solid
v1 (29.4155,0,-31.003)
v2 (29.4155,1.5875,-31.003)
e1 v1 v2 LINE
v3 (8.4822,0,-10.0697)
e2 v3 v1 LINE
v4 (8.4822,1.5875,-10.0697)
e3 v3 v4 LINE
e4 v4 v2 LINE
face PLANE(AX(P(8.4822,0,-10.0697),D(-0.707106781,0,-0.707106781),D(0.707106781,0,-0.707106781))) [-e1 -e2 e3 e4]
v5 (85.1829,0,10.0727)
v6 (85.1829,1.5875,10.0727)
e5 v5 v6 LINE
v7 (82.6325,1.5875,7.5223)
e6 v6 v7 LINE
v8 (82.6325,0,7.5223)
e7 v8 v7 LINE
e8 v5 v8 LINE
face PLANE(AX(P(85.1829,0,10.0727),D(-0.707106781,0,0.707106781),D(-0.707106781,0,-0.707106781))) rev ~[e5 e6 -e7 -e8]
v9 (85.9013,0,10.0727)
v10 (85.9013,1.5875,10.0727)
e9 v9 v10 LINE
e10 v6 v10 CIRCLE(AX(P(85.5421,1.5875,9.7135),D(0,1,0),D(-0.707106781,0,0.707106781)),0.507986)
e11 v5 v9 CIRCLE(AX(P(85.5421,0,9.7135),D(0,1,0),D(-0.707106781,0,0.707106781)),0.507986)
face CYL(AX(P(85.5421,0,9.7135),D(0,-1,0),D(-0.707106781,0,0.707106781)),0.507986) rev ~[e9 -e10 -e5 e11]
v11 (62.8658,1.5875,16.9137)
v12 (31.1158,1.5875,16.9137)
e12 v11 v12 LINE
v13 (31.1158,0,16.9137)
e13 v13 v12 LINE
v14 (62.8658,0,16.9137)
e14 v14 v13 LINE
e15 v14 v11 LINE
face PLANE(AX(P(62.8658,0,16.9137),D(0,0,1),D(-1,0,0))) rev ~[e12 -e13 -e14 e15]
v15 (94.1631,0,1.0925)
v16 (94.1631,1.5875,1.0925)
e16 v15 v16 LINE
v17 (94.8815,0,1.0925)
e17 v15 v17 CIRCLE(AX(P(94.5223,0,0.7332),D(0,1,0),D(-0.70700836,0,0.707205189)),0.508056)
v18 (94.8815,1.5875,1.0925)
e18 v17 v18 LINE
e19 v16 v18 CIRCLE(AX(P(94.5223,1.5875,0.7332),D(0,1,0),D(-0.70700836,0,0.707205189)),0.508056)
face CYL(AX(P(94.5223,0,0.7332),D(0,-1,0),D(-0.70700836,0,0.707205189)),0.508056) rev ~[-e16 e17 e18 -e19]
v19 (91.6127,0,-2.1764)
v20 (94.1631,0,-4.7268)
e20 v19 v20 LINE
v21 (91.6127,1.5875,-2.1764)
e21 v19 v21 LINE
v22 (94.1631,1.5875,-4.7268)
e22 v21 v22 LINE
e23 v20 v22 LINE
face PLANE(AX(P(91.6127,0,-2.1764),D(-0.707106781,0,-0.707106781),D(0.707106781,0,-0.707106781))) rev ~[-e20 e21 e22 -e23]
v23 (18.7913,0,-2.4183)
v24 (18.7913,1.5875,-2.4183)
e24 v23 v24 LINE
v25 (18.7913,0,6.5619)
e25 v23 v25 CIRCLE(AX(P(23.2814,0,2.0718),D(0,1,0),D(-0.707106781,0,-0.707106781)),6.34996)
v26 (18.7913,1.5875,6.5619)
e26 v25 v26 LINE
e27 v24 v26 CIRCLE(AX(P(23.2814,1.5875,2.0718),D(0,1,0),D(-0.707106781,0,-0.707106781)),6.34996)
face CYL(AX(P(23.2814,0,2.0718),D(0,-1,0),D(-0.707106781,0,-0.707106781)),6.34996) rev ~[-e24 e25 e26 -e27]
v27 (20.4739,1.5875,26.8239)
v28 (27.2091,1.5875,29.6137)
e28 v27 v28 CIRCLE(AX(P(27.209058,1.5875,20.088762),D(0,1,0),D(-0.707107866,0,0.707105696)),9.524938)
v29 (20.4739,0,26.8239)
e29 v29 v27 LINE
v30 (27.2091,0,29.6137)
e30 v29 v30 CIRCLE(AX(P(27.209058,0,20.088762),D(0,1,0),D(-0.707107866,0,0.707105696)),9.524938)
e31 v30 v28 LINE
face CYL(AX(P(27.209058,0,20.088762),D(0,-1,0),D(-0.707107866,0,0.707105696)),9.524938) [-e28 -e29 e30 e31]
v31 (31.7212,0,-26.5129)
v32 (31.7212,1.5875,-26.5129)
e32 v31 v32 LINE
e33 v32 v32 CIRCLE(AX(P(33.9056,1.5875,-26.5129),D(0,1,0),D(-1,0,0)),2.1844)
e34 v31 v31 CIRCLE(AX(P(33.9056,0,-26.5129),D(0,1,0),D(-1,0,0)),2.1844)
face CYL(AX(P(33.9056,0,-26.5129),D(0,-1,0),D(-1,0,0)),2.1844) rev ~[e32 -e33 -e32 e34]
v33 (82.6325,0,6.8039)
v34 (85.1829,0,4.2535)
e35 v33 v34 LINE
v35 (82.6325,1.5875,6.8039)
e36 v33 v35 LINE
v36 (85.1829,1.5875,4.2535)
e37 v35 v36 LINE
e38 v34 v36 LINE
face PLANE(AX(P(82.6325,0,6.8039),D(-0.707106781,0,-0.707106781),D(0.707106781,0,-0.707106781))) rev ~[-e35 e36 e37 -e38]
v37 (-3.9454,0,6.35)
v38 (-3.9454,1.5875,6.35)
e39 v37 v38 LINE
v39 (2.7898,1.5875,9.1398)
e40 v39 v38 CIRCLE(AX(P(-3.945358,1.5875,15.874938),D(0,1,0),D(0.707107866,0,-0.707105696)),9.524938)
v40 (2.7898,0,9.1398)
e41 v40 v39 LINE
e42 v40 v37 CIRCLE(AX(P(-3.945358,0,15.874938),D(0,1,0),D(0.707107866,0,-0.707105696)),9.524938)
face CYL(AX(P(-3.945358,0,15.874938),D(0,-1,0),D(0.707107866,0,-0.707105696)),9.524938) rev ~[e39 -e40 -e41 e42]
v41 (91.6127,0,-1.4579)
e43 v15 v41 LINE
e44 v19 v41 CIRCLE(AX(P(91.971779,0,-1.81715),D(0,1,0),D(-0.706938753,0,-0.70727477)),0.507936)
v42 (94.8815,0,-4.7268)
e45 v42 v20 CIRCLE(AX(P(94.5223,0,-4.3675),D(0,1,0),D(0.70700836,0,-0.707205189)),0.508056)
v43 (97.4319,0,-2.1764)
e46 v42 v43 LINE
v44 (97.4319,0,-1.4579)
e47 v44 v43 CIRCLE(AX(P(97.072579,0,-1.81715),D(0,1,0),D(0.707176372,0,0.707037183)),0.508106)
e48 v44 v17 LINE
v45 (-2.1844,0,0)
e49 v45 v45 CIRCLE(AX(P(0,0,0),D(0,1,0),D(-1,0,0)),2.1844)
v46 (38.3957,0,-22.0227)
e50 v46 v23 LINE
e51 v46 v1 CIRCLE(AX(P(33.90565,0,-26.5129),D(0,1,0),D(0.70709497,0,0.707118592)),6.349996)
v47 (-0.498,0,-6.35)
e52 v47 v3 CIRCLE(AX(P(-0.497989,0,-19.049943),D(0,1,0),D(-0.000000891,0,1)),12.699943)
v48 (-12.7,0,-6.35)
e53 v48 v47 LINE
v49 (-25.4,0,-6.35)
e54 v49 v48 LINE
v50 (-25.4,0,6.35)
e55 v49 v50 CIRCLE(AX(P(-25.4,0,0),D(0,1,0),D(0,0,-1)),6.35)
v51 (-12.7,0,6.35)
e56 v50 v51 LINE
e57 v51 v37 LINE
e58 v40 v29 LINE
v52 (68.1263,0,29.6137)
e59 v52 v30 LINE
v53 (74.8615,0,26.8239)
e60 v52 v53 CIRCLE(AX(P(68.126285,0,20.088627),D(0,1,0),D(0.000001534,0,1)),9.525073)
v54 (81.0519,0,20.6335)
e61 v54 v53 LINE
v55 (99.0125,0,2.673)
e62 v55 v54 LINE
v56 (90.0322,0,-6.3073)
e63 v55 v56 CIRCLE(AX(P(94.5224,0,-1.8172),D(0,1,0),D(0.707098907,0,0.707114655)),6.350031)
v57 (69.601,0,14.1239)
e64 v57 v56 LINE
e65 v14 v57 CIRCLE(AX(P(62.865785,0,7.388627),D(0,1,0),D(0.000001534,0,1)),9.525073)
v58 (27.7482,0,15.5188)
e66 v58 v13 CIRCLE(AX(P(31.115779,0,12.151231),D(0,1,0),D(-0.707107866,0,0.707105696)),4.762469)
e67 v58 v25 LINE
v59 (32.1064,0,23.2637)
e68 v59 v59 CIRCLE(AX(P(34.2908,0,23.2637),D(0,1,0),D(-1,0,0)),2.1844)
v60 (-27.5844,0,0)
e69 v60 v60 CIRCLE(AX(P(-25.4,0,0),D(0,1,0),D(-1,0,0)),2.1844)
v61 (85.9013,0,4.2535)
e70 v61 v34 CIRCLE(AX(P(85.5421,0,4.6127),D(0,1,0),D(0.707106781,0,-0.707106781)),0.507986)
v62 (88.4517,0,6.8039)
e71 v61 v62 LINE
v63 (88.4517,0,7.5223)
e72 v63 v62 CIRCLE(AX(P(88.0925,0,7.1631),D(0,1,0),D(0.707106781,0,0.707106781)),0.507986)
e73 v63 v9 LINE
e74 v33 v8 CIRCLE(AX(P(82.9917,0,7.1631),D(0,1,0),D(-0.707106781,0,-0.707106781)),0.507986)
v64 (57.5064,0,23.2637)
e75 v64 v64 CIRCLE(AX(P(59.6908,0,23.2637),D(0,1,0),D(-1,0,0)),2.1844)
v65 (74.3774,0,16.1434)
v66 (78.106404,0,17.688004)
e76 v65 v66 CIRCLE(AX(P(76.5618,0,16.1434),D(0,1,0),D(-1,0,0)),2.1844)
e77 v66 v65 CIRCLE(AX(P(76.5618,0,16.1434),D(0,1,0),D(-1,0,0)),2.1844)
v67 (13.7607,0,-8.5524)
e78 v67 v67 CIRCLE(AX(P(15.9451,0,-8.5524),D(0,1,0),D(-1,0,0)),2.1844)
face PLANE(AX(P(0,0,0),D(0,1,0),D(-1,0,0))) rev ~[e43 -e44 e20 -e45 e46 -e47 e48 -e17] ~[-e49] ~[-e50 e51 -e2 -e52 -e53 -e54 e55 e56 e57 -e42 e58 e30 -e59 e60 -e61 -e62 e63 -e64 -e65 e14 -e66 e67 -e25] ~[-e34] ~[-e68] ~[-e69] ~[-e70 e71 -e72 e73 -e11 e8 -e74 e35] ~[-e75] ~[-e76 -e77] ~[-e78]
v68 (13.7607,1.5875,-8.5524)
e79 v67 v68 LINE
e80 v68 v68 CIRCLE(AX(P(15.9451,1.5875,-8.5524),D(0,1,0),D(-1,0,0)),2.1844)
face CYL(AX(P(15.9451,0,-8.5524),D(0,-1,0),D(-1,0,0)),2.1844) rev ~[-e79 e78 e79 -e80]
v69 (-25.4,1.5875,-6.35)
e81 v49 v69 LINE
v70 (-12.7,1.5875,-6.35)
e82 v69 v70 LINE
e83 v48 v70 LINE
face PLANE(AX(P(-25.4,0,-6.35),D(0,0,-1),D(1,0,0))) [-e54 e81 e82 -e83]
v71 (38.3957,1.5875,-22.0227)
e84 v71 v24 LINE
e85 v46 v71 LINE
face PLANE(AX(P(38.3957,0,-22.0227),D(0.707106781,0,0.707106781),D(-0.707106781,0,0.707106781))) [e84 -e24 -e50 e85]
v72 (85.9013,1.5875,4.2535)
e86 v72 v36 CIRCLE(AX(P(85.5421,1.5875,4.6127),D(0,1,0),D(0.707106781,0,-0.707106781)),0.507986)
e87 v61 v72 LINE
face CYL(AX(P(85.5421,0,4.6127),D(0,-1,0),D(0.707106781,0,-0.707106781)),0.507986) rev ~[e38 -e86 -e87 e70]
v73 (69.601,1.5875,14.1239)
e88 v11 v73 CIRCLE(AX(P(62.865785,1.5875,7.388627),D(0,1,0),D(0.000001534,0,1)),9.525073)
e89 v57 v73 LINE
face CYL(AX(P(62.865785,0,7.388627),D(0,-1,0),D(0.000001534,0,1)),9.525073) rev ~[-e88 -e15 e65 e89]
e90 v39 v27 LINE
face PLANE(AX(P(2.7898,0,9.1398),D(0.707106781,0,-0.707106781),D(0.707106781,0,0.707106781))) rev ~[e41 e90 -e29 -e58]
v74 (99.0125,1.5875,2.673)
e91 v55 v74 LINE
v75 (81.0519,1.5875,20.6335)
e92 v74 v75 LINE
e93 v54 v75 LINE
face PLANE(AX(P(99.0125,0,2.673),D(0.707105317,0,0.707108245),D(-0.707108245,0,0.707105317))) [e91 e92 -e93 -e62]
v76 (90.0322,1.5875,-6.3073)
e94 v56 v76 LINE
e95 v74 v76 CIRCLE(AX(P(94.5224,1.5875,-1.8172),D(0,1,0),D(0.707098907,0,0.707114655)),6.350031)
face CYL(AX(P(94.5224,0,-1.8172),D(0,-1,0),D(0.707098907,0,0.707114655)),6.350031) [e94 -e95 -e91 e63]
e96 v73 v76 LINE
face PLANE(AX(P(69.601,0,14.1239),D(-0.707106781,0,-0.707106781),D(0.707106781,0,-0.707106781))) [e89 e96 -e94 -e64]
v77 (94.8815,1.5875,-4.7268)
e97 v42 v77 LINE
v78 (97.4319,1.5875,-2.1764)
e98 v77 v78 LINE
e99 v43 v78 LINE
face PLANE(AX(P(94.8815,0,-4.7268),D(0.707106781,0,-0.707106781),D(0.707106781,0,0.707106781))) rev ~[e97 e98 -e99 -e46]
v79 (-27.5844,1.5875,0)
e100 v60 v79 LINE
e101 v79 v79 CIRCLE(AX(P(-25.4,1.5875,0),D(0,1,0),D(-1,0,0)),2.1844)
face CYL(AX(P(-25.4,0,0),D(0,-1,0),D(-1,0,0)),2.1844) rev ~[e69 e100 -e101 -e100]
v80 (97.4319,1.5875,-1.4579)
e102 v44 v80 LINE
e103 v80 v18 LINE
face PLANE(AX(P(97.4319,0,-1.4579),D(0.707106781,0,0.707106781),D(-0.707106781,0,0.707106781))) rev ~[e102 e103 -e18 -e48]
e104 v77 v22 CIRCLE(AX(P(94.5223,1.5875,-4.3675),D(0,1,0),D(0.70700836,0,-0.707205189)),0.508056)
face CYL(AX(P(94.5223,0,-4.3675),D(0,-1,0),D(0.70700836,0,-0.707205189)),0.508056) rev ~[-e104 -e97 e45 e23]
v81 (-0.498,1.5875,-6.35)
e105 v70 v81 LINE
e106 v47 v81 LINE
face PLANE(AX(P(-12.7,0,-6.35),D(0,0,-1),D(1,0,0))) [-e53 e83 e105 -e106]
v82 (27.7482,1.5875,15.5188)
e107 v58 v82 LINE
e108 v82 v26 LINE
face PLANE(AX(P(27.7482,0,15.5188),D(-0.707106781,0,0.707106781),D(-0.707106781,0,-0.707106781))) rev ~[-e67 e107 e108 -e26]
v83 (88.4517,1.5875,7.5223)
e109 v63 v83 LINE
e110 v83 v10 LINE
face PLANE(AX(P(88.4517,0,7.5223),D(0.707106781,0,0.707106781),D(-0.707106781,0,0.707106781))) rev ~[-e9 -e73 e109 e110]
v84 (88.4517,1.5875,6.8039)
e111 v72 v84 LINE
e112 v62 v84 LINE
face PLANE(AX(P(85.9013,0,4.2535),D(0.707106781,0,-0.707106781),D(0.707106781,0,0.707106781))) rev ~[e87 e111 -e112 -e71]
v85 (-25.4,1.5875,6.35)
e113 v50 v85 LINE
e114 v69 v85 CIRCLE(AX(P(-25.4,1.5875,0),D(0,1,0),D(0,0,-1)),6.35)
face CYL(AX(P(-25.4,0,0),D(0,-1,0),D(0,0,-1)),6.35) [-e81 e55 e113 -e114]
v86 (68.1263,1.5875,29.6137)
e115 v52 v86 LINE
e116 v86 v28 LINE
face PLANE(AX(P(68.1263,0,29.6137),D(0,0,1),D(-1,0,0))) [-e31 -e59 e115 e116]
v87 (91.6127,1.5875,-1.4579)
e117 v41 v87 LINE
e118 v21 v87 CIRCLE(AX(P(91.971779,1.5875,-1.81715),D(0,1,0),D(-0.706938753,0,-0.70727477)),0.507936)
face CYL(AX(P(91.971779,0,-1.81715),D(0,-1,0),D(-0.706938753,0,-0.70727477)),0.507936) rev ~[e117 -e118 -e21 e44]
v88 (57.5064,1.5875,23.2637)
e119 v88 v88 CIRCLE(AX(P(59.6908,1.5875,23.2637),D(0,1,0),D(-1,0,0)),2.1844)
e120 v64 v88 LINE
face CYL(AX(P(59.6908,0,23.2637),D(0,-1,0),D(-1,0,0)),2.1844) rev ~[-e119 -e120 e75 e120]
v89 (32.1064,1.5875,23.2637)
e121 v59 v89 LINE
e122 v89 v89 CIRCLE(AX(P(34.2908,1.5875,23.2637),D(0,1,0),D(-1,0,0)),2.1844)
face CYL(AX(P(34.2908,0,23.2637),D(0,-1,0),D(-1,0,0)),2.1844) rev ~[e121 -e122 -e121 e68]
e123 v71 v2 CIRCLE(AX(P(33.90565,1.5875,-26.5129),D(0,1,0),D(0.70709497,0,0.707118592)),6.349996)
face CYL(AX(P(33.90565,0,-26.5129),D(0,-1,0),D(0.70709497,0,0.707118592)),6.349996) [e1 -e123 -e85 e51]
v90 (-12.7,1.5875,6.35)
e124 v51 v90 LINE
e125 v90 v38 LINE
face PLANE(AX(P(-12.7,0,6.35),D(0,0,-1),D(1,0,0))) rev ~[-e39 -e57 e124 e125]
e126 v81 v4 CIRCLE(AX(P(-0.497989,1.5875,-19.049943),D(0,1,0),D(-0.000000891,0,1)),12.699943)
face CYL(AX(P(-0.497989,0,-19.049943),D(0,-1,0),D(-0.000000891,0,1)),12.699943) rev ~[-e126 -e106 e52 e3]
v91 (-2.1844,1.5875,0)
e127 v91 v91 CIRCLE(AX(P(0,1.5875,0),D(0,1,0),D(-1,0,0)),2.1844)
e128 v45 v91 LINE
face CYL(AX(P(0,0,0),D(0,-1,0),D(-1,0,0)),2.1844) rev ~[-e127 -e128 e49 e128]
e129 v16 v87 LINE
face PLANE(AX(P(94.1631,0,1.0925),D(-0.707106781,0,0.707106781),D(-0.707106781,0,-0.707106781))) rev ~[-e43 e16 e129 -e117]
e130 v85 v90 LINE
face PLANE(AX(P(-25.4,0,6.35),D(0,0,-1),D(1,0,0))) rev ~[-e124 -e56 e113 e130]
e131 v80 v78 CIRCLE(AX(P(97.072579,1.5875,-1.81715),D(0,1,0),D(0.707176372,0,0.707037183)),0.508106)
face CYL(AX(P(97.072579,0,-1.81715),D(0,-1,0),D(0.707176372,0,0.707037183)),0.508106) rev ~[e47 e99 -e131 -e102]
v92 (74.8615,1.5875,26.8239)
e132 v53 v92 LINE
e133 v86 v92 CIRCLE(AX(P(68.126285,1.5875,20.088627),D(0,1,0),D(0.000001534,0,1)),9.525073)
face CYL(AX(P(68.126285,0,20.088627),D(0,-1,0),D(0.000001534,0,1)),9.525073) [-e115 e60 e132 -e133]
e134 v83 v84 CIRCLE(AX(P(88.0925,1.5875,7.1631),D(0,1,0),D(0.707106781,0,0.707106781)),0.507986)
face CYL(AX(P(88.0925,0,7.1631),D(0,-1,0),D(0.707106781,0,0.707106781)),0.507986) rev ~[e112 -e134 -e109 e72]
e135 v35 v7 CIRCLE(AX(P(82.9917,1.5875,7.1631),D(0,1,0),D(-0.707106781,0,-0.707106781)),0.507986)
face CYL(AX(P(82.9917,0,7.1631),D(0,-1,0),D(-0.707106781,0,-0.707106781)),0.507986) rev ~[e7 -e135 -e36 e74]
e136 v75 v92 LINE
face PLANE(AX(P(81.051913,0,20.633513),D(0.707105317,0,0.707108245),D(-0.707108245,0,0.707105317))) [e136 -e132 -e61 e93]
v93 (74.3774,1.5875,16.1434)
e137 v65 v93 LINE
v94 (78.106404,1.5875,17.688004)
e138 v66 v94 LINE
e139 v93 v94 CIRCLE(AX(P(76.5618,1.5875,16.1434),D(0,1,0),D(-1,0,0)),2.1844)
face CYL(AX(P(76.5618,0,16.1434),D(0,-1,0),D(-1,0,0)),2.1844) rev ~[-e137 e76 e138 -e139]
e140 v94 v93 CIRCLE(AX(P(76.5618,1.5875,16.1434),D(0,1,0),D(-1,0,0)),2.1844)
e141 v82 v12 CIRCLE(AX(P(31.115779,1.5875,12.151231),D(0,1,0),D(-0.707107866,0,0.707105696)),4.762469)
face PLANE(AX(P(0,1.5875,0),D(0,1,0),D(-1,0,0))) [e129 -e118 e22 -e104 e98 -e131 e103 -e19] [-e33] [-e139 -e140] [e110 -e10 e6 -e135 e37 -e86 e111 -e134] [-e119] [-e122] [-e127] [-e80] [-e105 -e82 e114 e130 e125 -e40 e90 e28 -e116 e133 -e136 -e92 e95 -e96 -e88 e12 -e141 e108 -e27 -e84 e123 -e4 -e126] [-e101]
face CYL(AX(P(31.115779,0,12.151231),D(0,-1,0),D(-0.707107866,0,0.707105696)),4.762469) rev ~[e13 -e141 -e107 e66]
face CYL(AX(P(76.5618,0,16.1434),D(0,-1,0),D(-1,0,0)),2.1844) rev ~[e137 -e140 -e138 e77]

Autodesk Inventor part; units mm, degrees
ref_plane "YZ Plane" through (0, 0, 0) normal (1, 0, 0) x (0, 1, 0)
ref_plane "XZ Plane" through (0, 0, 0) normal (0, 1, 0) x (-1, 0, 0)
ref_plane "XY Plane" through (0, 0, 0) normal (0, 0, 1) x (1, 0, 0)
sketch "main" plane through (0, 0, 0) normal (0, 0, 1) x (1, 0, 0)
  line L0 (-25.7346, 15.6158) -> (-23.1842, 13.0654)
  arc A0 (-23.1842, 12.347) -> (-23.1842, 13.0654) centre (-23.5434, 12.7062) ccw
  line L1 (-23.1842, 12.347) -> (-25.7346, 9.7966)
  line L2 (-29.0034, 13.0654) -> (-26.453, 15.6158)
  circle A1 centre (-26.0938, 12.7062) radius 2.1844 construction
  arc A2 (-29.0034, 13.0654) -> (-29.0034, 12.347) centre (-28.6442, 12.7062) ccw
  line L3 (-26.453, 9.7966) -> (-29.0034, 12.347)
  arc A3 (-32.1645, 3.3667) -> (-32.1645, 4.0851) centre (-32.5237, 3.7259) ccw
  arc A4 (-26.453, 9.7966) -> (-25.7346, 9.7966) centre (-26.0938, 10.1558) ccw
  arc A5 (-8.6781, 35.1568) -> (-15.4133, 32.367) centre (-8.6781, 25.6318) ccw
  circle A6 centre (-17.1136, 21.6864) radius 2.1844
  arc A7 (-25.7346, 15.6158) -> (-26.453, 15.6158) centre (-26.0938, 15.2566) ccw
  line L4 (-10.1527, 19.667) -> (-30.584, -0.7642)
  line L5 (-39.5642, 8.216) -> (-15.4133, 32.367)
  line L6 (-17.1136, 21.6864) -> (-10.7636, 21.6864) construction
  line L7 (-17.1136, 21.6864) -> (-21.6037, 26.1765)
  arc A8 (-34.7149, 6.6355) -> (-35.4333, 6.6355) centre (-35.0741, 6.2763) ccw
  line L8 (-34.7149, 6.6355) -> (-32.1645, 4.0851)
  line L9 (-32.1645, 3.3667) -> (-34.7149, 0.8163)
  arc A9 (-37.9837, 4.0851) -> (-37.9837, 3.3667) centre (-37.6245, 3.7259) ccw
  arc A10 (-35.4333, 0.8163) -> (-34.7149, 0.8163) centre (-35.0741, 1.1755) ccw
  line L10 (-35.4333, 0.8163) -> (-37.9837, 3.3667)
  arc A11 (-39.5642, 8.216) -> (-30.584, -0.7642) centre (-35.0741, 3.7259) ccw
  line L11 (-37.9837, 4.0851) -> (-35.4333, 6.6355)
  circle A12 centre (43.5032, -3.0093) radius 2.1844
  circle A13 centre (25.5426, -20.9698) radius 2.1844
  arc A14 (21.0525, -16.4797) -> (30.0328, -25.4599) centre (25.5426, -20.9698) ccw
  line L12 (21.0525, -16.4797) -> (40.6569, 3.1247)
  line L13 (50.966, -4.5267) -> (30.0328, -25.4599)
  circle A15 centre (59.4482, 5.5431) radius 2.1844
  line L14 (72.1482, 11.8931) -> (63.3936, 11.8931)
  line L15 (56.6584, 14.6829) -> (38.9743, 32.367)
  line L16 (72.1482, -0.8069) -> (59.9463, -0.8069)
  arc A16 (56.6584, 14.6829) -> (63.3936, 11.8931) centre (63.3936, 21.4181) ccw
  line L17 (84.8482, 11.8931) -> (72.1482, 11.8931)
  line L18 (84.8482, -0.8069) -> (72.1482, -0.8069)
  circle A17 centre (84.8482, 5.5431) radius 2.1844
  arc A18 (84.8482, -0.8069) -> (84.8482, 11.8931) centre (84.8482, 5.5431) ccw
  arc A19 (59.9463, -0.8069) -> (50.966, -4.5267) centre (59.9463, -13.5069) ccw
  arc A20 (-3.4175, 22.4568) -> (-10.1527, 19.667) centre (-3.4175, 12.9318) ccw
  line L19 (-3.4175, 22.4568) -> (28.3325, 22.4568)
  line L20 (-8.6781, 35.1568) -> (32.2391, 35.1568)
  arc A21 (31.7001, 21.0619) -> (28.3325, 22.4568) centre (28.3325, 17.6943) ccw
  arc A22 (38.9743, 32.367) -> (32.2391, 35.1568) centre (32.2391, 25.6318) ccw
  line L21 (31.7001, 21.0619) -> (40.6569, 12.105)
  line L22 (31.7001, 21.0619) -> (44.367, 21.0619) construction
  arc A23 (40.6569, 3.1247) -> (40.6569, 12.105) centre (36.1668, 7.6149) ccw
  circle A24 centre (25.1575, 28.8068) radius 2.1844
  circle A25 centre (-0.2425, 28.8068) radius 2.1844
  point P0 (7.2046, 10.3806)
  point P1 (59.4482, 11.8931)
  dimension "d5" = 12.7
  dimension "d6" = 135
  dimension "d7" = 9.525
  dimension "d8" = 12.7
  dimension "d9" = 9.525
  dimension "d10" = 9.525
  dimension "d11" = 12.7
  dimension "d12" = 4.7625
  dimension "d15" = 31.75
  dimension "d16" = 12.7
  dimension "d17" = 45
  dimension "d18" = 6.35
  dimension "d19" = 4.3688
  dimension "d20" = 6.35
  dimension "d24" = 4.3688
sketch "Sketch1" plane through (0, 0, 0) normal (0, 1, 0) x (-1, 0, 0)
  line L0 (-85.1829, 10.0727) -> (-82.6325, 7.5223)
  arc A0 (-82.6325, 6.8039) -> (-82.6325, 7.5223) centre (-82.9917, 7.1631) ccw
  line L1 (-82.6325, 6.8039) -> (-85.1829, 4.2535)
  line L2 (-88.4517, 7.5223) -> (-85.9013, 10.0727)
  circle A1 centre (-85.5421, 7.1631) radius 2.1844 construction
  arc A2 (-88.4517, 7.5223) -> (-88.4517, 6.8039) centre (-88.0925, 7.1631) ccw
  line L3 (-85.9013, 4.2535) -> (-88.4517, 6.8039)
  arc A3 (-91.6127, -2.1764) -> (-91.6127, -1.4579) centre (-91.9719, -1.8171) ccw
  arc A4 (-85.9013, 4.2535) -> (-85.1829, 4.2535) centre (-85.5421, 4.6127) ccw
  arc A5 (-68.1263, 29.6137) -> (-74.8615, 26.8239) centre (-68.1263, 20.0887) ccw
  circle A6 centre (-76.5618, 16.1434) radius 2.1844
  arc A7 (-85.1829, 10.0727) -> (-85.9013, 10.0727) centre (-85.5421, 9.7135) ccw
  line L4 (-69.601, 14.1239) -> (-90.0322, -6.3073)
  line L5 (-99.0125, 2.673) -> (-74.8615, 26.8239)
  line L6 (-76.5618, 16.1434) -> (-70.2118, 16.1434) construction
  line L7 (-76.5618, 16.1434) -> (-81.0519, 20.6335)
  arc A8 (-94.1631, 1.0925) -> (-94.8815, 1.0925) centre (-94.5223, 0.7332) ccw
  line L8 (-94.1631, 1.0925) -> (-91.6127, -1.4579)
  line L9 (-91.6127, -2.1764) -> (-94.1631, -4.7268)
  arc A9 (-97.4319, -1.4579) -> (-97.4319, -2.1764) centre (-97.0727, -1.8171) ccw
  arc A10 (-94.8815, -4.7268) -> (-94.1631, -4.7268) centre (-94.5223, -4.3675) ccw
  line L10 (-94.8815, -4.7268) -> (-97.4319, -2.1764)
  arc A11 (-99.0125, 2.673) -> (-90.0322, -6.3073) centre (-94.5223, -1.8172) ccw
  line L11 (-97.4319, -1.4579) -> (-94.8815, 1.0925)
  circle A12 centre (-15.9451, -8.5524) radius 2.1844
  circle A13 centre (-33.9056, -26.5129) radius 2.1844
  arc A14 (-38.3957, -22.0227) -> (-29.4155, -31.003) centre (-33.9056, -26.5129) ccw
  line L12 (-38.3957, -22.0227) -> (-18.7913, -2.4183)
  line L13 (-8.4822, -10.0697) -> (-29.4155, -31.003)
  circle A15 centre (0, 0) radius 2.1844
  line L14 (12.7, 6.35) -> (3.9454, 6.35)
  line L15 (-2.7898, 9.1398) -> (-20.4739, 26.8239)
  line L16 (12.7, -6.35) -> (0.498, -6.35)
  arc A16 (-2.7898, 9.1398) -> (3.9454, 6.35) centre (3.9454, 15.875) ccw
  line L17 (25.4, 6.35) -> (12.7, 6.35)
  line L18 (25.4, -6.35) -> (12.7, -6.35)
  circle A17 centre (25.4, 0) radius 2.1844
  arc A18 (25.4, -6.35) -> (25.4, 6.35) centre (25.4, 0) ccw
  arc A19 (0.498, -6.35) -> (-8.4822, -10.0697) centre (0.498, -19.05) ccw
  arc A20 (-62.8658, 16.9137) -> (-69.601, 14.1239) centre (-62.8658, 7.3887) ccw
  line L19 (-62.8658, 16.9137) -> (-31.1158, 16.9137)
  line L20 (-68.1263, 29.6137) -> (-27.2091, 29.6137)
  arc A21 (-27.7482, 15.5188) -> (-31.1158, 16.9137) centre (-31.1158, 12.1512) ccw
  arc A22 (-20.4739, 26.8239) -> (-27.2091, 29.6137) centre (-27.2091, 20.0887) ccw
  line L21 (-27.7482, 15.5188) -> (-18.7913, 6.5619)
  line L22 (-27.7482, 15.5188) -> (-15.0812, 15.5188) construction
  arc A23 (-18.7913, -2.4183) -> (-18.7913, 6.5619) centre (-23.2814, 2.0718) ccw
  circle A24 centre (-34.2908, 23.2637) radius 2.1844
  circle A25 centre (-59.6908, 23.2637) radius 2.1844
extrude "Extrusion1" add sketch "Sketch1" along normal blind 1.5875
properties part number "join_gusset" material "Acetal Resin, White"
